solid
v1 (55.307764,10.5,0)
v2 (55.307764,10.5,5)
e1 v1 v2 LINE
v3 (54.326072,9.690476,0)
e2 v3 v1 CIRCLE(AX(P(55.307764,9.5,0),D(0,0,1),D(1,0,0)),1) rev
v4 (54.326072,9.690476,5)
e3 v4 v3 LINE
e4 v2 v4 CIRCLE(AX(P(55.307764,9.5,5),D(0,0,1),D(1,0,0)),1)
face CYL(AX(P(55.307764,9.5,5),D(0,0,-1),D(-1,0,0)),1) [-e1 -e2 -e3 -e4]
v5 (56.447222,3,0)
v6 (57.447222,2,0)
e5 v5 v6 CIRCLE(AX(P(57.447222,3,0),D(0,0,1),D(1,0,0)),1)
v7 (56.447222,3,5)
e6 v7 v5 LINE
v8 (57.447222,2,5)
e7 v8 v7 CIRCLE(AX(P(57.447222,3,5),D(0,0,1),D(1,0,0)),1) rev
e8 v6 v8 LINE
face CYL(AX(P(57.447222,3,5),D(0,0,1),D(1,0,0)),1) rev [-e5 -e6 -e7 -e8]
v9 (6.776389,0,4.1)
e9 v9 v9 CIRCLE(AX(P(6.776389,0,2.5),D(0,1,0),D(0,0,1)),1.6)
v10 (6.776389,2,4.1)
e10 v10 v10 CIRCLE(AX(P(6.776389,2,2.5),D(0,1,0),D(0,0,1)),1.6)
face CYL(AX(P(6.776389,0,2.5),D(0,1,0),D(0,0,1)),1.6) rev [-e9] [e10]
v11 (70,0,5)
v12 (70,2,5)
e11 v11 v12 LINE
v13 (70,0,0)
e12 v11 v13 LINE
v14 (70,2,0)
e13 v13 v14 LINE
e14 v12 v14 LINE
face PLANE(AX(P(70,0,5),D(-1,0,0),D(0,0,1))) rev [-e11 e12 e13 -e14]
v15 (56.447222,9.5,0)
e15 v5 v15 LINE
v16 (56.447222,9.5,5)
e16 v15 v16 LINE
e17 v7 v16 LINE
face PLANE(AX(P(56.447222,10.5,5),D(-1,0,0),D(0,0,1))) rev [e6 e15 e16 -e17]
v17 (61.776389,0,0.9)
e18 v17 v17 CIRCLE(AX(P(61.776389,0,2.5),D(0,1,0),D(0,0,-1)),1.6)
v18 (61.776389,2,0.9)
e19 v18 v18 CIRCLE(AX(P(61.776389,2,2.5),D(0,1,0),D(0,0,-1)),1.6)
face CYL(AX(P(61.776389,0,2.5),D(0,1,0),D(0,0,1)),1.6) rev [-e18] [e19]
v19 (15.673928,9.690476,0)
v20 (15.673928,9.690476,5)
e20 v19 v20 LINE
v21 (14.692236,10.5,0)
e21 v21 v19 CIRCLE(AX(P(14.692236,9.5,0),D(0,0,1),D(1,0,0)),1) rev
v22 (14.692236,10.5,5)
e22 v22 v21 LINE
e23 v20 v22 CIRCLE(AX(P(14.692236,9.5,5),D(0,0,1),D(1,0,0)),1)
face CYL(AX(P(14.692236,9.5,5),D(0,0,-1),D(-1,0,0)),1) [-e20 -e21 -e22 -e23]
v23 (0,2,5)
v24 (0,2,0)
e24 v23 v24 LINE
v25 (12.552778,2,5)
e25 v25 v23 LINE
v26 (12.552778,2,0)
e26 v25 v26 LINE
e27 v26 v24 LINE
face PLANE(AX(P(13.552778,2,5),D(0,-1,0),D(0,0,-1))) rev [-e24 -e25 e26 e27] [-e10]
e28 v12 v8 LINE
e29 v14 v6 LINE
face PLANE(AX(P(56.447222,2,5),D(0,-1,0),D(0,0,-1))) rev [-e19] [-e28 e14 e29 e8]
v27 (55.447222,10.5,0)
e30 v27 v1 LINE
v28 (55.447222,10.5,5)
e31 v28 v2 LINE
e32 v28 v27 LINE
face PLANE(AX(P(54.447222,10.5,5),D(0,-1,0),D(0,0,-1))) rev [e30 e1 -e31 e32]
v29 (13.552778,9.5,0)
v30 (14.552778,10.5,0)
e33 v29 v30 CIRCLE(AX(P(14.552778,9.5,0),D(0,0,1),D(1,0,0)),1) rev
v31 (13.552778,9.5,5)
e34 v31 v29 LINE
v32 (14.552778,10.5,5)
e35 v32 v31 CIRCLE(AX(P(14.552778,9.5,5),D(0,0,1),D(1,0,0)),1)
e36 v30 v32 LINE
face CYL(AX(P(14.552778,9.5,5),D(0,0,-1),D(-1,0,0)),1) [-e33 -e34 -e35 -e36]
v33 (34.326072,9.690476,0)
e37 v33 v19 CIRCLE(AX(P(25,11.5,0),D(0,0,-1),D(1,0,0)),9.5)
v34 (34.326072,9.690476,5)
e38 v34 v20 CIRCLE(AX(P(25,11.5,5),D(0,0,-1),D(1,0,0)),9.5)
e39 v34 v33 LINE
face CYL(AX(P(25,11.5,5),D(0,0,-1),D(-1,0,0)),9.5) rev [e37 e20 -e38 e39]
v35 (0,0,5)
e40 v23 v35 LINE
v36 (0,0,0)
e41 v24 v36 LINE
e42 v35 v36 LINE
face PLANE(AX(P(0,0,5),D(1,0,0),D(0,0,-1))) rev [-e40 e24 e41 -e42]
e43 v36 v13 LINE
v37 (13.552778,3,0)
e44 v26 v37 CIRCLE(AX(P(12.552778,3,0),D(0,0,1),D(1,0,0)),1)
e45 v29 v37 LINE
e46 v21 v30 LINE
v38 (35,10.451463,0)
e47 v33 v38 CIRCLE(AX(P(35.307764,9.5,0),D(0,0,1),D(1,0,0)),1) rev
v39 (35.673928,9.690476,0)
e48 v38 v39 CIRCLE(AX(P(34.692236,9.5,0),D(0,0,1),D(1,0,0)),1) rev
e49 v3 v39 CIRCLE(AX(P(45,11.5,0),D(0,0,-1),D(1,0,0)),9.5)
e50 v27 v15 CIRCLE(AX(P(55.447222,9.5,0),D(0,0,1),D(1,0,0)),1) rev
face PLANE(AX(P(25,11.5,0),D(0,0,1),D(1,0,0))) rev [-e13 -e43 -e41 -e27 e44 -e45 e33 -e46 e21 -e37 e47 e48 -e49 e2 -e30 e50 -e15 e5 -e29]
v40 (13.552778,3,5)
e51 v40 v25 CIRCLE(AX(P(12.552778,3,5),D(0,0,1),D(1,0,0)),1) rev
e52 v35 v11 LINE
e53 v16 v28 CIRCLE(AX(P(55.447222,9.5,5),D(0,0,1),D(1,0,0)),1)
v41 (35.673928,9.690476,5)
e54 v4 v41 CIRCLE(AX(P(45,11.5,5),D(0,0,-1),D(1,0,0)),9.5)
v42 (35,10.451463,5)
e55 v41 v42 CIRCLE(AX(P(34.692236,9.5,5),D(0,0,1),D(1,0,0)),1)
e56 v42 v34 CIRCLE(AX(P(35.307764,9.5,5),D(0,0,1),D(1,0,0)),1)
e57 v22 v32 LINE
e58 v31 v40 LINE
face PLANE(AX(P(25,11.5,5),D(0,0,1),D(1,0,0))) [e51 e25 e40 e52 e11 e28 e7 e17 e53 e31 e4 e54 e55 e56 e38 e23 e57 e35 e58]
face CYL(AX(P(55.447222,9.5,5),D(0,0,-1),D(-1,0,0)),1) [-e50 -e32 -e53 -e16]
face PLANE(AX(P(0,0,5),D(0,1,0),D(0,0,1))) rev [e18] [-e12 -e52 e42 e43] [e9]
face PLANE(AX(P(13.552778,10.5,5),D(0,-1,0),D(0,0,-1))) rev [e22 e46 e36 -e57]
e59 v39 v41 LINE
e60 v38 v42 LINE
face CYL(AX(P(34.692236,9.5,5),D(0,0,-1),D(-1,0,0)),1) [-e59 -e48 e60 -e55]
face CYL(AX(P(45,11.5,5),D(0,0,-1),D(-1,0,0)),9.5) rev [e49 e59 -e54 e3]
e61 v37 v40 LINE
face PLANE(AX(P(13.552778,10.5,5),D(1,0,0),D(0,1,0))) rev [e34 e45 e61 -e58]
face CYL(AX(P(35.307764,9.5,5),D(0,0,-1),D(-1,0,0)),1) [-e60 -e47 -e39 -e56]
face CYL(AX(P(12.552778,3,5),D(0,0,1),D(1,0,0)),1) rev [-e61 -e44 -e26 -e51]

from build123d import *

# Parameters (mm, degrees)
BOSS_EXTRU_1_DEPTH      = 5
ESQUISSE2_R             = 1.6
ENL_V_MAT_EXTRU_1_DEPTH = 71.691230008
CONG_1_R                = 1
CONG_2_R                = 1


with BuildPart() as part:
    # Esquisse1 → Boss.-Extru.1 (new body)
    with BuildSketch(Plane.XY):
        with BuildLine():
            Line((0, 0), (70, 0))
            Line((70, 0), (70, 2))
            Line((70, 2), (56.447221814, 2))
            Line((56.447221814, 2), (56.447221814, 10.5))
            Line((56.447221814, 10.5), (54.447221814, 10.5))
            ThreePointArc((54.447221814, 10.5), (45, 2), (35.552778186, 10.5))
            Line((35.552778186, 10.5), (34.447221814, 10.5))
            ThreePointArc((34.447221814, 10.5), (25, 2), (15.552778186, 10.5))
            Line((15.552778186, 10.5), (13.552778186, 10.5))
            Line((13.552778186, 10.5), (13.552778186, 2))
            Line((13.552778186, 2), (0, 2))
            Line((0, 2), (0, 0))
        make_face()
    extrude(amount=BOSS_EXTRU_1_DEPTH)

    # Esquisse2 → Enlèv. mat.-Extru.1 (cut, through all)
    with BuildSketch(Plane(origin=(0, 2, 0), x_dir=(1, 0, 0), z_dir=(0, 1, 0))):
        with Locations(Location((6.776389093, -2.5, 0), (0, 0, 270))):
            Circle(ESQUISSE2_R)
        with Locations(Location((61.776389093, -2.5, 0), (0, 0, 90))):
            Circle(ESQUISSE2_R)
    extrude(amount=-ENL_V_MAT_EXTRU_1_DEPTH, mode=Mode.SUBTRACT)

    # Congé1
    cong_1_edges = [part.edges().sort_by_distance(p)[0] for p in [
        (13.552778186, 2, 2.5),
    ]]
    fillet(cong_1_edges, radius=CONG_1_R)

    # Congé2
    # the kernel refuses this fillet: 1 mm, written as the material it adds along each edge
    with BuildSketch(Plane(origin=(56.447221814, 2, 0), x_dir=(1, 0, 0), z_dir=(0, 0, 1))) as cong_2_piece_1:
        with BuildLine():
            CenterArc((CONG_2_R, CONG_2_R), CONG_2_R, 180, 90)
            Line((0, CONG_2_R), (0, 0))
            Line((0, 0), (CONG_2_R, 0))
        make_face()
    extrude(amount=5)
    # the kernel refuses this fillet: 1 mm, written as the material it takes off along each edge
    with BuildSketch(Plane(origin=(13.552778186, 10.5, -2.5), x_dir=(0, -1, 0), z_dir=(0, 0, 1)), Plane(origin=(56.447221814, 10.5, -2.5), x_dir=(-1, 0, 0), z_dir=(0, 0, 1))) as cong_2_2_piece_1:
        with BuildLine():
            CenterArc((CONG_2_R, CONG_2_R), CONG_2_R, 180, 90)
            Line((0, CONG_2_R), (0, 0))
            Line((0, 0), (CONG_2_R, 0))
        make_face()
    extrude(amount=10, mode=Mode.SUBTRACT)
    with BuildSketch(Plane(origin=(15.552778186, 10.5, -2.151355625), x_dir=(-1, 0, 0), z_dir=(0, 0, 1)), Plane(origin=(35.552778186, 10.5, -2.151355625), x_dir=(-1, 0, 0), z_dir=(0, 0, 1))) as cong_2_2_piece_2:
        with BuildLine():
            CenterArc((0.86054225, 1), CONG_2_R, 190.980575428, 79.019424572)
            ThreePointArc((-0.121149565, 0.80952381), (-0.05185196, 0.406067322), (0, 0))
            Line((0, 0), (0.86054225, 0))
        make_face()
    extrude(amount=9.302711251, mode=Mode.SUBTRACT)
    with BuildSketch(Plane(origin=(34.447221814, 10.5, -2.151355625), x_dir=(-0.1480070865029111, -0.9889863003828312, 0), z_dir=(0, 0, 1)), Plane(origin=(54.447221814, 10.5, -2.151355625), x_dir=(-0.1480070865029111, -0.9889863003828312, 0), z_dir=(0, 0, 1))) as cong_2_2_piece_3:
        with BuildLine():
            CenterArc((0.861619949, 0.999071583), CONG_2_R, 188.511451923, 79.019424572)
            Line((-0.127366351, 0.851064496), (0, 0))
            ThreePointArc((0, 0), (0.409269476, 0.008819963), (0.818538952, 0))
        make_face()
    extrude(amount=9.302711251, mode=Mode.SUBTRACT)


solid = part.part
